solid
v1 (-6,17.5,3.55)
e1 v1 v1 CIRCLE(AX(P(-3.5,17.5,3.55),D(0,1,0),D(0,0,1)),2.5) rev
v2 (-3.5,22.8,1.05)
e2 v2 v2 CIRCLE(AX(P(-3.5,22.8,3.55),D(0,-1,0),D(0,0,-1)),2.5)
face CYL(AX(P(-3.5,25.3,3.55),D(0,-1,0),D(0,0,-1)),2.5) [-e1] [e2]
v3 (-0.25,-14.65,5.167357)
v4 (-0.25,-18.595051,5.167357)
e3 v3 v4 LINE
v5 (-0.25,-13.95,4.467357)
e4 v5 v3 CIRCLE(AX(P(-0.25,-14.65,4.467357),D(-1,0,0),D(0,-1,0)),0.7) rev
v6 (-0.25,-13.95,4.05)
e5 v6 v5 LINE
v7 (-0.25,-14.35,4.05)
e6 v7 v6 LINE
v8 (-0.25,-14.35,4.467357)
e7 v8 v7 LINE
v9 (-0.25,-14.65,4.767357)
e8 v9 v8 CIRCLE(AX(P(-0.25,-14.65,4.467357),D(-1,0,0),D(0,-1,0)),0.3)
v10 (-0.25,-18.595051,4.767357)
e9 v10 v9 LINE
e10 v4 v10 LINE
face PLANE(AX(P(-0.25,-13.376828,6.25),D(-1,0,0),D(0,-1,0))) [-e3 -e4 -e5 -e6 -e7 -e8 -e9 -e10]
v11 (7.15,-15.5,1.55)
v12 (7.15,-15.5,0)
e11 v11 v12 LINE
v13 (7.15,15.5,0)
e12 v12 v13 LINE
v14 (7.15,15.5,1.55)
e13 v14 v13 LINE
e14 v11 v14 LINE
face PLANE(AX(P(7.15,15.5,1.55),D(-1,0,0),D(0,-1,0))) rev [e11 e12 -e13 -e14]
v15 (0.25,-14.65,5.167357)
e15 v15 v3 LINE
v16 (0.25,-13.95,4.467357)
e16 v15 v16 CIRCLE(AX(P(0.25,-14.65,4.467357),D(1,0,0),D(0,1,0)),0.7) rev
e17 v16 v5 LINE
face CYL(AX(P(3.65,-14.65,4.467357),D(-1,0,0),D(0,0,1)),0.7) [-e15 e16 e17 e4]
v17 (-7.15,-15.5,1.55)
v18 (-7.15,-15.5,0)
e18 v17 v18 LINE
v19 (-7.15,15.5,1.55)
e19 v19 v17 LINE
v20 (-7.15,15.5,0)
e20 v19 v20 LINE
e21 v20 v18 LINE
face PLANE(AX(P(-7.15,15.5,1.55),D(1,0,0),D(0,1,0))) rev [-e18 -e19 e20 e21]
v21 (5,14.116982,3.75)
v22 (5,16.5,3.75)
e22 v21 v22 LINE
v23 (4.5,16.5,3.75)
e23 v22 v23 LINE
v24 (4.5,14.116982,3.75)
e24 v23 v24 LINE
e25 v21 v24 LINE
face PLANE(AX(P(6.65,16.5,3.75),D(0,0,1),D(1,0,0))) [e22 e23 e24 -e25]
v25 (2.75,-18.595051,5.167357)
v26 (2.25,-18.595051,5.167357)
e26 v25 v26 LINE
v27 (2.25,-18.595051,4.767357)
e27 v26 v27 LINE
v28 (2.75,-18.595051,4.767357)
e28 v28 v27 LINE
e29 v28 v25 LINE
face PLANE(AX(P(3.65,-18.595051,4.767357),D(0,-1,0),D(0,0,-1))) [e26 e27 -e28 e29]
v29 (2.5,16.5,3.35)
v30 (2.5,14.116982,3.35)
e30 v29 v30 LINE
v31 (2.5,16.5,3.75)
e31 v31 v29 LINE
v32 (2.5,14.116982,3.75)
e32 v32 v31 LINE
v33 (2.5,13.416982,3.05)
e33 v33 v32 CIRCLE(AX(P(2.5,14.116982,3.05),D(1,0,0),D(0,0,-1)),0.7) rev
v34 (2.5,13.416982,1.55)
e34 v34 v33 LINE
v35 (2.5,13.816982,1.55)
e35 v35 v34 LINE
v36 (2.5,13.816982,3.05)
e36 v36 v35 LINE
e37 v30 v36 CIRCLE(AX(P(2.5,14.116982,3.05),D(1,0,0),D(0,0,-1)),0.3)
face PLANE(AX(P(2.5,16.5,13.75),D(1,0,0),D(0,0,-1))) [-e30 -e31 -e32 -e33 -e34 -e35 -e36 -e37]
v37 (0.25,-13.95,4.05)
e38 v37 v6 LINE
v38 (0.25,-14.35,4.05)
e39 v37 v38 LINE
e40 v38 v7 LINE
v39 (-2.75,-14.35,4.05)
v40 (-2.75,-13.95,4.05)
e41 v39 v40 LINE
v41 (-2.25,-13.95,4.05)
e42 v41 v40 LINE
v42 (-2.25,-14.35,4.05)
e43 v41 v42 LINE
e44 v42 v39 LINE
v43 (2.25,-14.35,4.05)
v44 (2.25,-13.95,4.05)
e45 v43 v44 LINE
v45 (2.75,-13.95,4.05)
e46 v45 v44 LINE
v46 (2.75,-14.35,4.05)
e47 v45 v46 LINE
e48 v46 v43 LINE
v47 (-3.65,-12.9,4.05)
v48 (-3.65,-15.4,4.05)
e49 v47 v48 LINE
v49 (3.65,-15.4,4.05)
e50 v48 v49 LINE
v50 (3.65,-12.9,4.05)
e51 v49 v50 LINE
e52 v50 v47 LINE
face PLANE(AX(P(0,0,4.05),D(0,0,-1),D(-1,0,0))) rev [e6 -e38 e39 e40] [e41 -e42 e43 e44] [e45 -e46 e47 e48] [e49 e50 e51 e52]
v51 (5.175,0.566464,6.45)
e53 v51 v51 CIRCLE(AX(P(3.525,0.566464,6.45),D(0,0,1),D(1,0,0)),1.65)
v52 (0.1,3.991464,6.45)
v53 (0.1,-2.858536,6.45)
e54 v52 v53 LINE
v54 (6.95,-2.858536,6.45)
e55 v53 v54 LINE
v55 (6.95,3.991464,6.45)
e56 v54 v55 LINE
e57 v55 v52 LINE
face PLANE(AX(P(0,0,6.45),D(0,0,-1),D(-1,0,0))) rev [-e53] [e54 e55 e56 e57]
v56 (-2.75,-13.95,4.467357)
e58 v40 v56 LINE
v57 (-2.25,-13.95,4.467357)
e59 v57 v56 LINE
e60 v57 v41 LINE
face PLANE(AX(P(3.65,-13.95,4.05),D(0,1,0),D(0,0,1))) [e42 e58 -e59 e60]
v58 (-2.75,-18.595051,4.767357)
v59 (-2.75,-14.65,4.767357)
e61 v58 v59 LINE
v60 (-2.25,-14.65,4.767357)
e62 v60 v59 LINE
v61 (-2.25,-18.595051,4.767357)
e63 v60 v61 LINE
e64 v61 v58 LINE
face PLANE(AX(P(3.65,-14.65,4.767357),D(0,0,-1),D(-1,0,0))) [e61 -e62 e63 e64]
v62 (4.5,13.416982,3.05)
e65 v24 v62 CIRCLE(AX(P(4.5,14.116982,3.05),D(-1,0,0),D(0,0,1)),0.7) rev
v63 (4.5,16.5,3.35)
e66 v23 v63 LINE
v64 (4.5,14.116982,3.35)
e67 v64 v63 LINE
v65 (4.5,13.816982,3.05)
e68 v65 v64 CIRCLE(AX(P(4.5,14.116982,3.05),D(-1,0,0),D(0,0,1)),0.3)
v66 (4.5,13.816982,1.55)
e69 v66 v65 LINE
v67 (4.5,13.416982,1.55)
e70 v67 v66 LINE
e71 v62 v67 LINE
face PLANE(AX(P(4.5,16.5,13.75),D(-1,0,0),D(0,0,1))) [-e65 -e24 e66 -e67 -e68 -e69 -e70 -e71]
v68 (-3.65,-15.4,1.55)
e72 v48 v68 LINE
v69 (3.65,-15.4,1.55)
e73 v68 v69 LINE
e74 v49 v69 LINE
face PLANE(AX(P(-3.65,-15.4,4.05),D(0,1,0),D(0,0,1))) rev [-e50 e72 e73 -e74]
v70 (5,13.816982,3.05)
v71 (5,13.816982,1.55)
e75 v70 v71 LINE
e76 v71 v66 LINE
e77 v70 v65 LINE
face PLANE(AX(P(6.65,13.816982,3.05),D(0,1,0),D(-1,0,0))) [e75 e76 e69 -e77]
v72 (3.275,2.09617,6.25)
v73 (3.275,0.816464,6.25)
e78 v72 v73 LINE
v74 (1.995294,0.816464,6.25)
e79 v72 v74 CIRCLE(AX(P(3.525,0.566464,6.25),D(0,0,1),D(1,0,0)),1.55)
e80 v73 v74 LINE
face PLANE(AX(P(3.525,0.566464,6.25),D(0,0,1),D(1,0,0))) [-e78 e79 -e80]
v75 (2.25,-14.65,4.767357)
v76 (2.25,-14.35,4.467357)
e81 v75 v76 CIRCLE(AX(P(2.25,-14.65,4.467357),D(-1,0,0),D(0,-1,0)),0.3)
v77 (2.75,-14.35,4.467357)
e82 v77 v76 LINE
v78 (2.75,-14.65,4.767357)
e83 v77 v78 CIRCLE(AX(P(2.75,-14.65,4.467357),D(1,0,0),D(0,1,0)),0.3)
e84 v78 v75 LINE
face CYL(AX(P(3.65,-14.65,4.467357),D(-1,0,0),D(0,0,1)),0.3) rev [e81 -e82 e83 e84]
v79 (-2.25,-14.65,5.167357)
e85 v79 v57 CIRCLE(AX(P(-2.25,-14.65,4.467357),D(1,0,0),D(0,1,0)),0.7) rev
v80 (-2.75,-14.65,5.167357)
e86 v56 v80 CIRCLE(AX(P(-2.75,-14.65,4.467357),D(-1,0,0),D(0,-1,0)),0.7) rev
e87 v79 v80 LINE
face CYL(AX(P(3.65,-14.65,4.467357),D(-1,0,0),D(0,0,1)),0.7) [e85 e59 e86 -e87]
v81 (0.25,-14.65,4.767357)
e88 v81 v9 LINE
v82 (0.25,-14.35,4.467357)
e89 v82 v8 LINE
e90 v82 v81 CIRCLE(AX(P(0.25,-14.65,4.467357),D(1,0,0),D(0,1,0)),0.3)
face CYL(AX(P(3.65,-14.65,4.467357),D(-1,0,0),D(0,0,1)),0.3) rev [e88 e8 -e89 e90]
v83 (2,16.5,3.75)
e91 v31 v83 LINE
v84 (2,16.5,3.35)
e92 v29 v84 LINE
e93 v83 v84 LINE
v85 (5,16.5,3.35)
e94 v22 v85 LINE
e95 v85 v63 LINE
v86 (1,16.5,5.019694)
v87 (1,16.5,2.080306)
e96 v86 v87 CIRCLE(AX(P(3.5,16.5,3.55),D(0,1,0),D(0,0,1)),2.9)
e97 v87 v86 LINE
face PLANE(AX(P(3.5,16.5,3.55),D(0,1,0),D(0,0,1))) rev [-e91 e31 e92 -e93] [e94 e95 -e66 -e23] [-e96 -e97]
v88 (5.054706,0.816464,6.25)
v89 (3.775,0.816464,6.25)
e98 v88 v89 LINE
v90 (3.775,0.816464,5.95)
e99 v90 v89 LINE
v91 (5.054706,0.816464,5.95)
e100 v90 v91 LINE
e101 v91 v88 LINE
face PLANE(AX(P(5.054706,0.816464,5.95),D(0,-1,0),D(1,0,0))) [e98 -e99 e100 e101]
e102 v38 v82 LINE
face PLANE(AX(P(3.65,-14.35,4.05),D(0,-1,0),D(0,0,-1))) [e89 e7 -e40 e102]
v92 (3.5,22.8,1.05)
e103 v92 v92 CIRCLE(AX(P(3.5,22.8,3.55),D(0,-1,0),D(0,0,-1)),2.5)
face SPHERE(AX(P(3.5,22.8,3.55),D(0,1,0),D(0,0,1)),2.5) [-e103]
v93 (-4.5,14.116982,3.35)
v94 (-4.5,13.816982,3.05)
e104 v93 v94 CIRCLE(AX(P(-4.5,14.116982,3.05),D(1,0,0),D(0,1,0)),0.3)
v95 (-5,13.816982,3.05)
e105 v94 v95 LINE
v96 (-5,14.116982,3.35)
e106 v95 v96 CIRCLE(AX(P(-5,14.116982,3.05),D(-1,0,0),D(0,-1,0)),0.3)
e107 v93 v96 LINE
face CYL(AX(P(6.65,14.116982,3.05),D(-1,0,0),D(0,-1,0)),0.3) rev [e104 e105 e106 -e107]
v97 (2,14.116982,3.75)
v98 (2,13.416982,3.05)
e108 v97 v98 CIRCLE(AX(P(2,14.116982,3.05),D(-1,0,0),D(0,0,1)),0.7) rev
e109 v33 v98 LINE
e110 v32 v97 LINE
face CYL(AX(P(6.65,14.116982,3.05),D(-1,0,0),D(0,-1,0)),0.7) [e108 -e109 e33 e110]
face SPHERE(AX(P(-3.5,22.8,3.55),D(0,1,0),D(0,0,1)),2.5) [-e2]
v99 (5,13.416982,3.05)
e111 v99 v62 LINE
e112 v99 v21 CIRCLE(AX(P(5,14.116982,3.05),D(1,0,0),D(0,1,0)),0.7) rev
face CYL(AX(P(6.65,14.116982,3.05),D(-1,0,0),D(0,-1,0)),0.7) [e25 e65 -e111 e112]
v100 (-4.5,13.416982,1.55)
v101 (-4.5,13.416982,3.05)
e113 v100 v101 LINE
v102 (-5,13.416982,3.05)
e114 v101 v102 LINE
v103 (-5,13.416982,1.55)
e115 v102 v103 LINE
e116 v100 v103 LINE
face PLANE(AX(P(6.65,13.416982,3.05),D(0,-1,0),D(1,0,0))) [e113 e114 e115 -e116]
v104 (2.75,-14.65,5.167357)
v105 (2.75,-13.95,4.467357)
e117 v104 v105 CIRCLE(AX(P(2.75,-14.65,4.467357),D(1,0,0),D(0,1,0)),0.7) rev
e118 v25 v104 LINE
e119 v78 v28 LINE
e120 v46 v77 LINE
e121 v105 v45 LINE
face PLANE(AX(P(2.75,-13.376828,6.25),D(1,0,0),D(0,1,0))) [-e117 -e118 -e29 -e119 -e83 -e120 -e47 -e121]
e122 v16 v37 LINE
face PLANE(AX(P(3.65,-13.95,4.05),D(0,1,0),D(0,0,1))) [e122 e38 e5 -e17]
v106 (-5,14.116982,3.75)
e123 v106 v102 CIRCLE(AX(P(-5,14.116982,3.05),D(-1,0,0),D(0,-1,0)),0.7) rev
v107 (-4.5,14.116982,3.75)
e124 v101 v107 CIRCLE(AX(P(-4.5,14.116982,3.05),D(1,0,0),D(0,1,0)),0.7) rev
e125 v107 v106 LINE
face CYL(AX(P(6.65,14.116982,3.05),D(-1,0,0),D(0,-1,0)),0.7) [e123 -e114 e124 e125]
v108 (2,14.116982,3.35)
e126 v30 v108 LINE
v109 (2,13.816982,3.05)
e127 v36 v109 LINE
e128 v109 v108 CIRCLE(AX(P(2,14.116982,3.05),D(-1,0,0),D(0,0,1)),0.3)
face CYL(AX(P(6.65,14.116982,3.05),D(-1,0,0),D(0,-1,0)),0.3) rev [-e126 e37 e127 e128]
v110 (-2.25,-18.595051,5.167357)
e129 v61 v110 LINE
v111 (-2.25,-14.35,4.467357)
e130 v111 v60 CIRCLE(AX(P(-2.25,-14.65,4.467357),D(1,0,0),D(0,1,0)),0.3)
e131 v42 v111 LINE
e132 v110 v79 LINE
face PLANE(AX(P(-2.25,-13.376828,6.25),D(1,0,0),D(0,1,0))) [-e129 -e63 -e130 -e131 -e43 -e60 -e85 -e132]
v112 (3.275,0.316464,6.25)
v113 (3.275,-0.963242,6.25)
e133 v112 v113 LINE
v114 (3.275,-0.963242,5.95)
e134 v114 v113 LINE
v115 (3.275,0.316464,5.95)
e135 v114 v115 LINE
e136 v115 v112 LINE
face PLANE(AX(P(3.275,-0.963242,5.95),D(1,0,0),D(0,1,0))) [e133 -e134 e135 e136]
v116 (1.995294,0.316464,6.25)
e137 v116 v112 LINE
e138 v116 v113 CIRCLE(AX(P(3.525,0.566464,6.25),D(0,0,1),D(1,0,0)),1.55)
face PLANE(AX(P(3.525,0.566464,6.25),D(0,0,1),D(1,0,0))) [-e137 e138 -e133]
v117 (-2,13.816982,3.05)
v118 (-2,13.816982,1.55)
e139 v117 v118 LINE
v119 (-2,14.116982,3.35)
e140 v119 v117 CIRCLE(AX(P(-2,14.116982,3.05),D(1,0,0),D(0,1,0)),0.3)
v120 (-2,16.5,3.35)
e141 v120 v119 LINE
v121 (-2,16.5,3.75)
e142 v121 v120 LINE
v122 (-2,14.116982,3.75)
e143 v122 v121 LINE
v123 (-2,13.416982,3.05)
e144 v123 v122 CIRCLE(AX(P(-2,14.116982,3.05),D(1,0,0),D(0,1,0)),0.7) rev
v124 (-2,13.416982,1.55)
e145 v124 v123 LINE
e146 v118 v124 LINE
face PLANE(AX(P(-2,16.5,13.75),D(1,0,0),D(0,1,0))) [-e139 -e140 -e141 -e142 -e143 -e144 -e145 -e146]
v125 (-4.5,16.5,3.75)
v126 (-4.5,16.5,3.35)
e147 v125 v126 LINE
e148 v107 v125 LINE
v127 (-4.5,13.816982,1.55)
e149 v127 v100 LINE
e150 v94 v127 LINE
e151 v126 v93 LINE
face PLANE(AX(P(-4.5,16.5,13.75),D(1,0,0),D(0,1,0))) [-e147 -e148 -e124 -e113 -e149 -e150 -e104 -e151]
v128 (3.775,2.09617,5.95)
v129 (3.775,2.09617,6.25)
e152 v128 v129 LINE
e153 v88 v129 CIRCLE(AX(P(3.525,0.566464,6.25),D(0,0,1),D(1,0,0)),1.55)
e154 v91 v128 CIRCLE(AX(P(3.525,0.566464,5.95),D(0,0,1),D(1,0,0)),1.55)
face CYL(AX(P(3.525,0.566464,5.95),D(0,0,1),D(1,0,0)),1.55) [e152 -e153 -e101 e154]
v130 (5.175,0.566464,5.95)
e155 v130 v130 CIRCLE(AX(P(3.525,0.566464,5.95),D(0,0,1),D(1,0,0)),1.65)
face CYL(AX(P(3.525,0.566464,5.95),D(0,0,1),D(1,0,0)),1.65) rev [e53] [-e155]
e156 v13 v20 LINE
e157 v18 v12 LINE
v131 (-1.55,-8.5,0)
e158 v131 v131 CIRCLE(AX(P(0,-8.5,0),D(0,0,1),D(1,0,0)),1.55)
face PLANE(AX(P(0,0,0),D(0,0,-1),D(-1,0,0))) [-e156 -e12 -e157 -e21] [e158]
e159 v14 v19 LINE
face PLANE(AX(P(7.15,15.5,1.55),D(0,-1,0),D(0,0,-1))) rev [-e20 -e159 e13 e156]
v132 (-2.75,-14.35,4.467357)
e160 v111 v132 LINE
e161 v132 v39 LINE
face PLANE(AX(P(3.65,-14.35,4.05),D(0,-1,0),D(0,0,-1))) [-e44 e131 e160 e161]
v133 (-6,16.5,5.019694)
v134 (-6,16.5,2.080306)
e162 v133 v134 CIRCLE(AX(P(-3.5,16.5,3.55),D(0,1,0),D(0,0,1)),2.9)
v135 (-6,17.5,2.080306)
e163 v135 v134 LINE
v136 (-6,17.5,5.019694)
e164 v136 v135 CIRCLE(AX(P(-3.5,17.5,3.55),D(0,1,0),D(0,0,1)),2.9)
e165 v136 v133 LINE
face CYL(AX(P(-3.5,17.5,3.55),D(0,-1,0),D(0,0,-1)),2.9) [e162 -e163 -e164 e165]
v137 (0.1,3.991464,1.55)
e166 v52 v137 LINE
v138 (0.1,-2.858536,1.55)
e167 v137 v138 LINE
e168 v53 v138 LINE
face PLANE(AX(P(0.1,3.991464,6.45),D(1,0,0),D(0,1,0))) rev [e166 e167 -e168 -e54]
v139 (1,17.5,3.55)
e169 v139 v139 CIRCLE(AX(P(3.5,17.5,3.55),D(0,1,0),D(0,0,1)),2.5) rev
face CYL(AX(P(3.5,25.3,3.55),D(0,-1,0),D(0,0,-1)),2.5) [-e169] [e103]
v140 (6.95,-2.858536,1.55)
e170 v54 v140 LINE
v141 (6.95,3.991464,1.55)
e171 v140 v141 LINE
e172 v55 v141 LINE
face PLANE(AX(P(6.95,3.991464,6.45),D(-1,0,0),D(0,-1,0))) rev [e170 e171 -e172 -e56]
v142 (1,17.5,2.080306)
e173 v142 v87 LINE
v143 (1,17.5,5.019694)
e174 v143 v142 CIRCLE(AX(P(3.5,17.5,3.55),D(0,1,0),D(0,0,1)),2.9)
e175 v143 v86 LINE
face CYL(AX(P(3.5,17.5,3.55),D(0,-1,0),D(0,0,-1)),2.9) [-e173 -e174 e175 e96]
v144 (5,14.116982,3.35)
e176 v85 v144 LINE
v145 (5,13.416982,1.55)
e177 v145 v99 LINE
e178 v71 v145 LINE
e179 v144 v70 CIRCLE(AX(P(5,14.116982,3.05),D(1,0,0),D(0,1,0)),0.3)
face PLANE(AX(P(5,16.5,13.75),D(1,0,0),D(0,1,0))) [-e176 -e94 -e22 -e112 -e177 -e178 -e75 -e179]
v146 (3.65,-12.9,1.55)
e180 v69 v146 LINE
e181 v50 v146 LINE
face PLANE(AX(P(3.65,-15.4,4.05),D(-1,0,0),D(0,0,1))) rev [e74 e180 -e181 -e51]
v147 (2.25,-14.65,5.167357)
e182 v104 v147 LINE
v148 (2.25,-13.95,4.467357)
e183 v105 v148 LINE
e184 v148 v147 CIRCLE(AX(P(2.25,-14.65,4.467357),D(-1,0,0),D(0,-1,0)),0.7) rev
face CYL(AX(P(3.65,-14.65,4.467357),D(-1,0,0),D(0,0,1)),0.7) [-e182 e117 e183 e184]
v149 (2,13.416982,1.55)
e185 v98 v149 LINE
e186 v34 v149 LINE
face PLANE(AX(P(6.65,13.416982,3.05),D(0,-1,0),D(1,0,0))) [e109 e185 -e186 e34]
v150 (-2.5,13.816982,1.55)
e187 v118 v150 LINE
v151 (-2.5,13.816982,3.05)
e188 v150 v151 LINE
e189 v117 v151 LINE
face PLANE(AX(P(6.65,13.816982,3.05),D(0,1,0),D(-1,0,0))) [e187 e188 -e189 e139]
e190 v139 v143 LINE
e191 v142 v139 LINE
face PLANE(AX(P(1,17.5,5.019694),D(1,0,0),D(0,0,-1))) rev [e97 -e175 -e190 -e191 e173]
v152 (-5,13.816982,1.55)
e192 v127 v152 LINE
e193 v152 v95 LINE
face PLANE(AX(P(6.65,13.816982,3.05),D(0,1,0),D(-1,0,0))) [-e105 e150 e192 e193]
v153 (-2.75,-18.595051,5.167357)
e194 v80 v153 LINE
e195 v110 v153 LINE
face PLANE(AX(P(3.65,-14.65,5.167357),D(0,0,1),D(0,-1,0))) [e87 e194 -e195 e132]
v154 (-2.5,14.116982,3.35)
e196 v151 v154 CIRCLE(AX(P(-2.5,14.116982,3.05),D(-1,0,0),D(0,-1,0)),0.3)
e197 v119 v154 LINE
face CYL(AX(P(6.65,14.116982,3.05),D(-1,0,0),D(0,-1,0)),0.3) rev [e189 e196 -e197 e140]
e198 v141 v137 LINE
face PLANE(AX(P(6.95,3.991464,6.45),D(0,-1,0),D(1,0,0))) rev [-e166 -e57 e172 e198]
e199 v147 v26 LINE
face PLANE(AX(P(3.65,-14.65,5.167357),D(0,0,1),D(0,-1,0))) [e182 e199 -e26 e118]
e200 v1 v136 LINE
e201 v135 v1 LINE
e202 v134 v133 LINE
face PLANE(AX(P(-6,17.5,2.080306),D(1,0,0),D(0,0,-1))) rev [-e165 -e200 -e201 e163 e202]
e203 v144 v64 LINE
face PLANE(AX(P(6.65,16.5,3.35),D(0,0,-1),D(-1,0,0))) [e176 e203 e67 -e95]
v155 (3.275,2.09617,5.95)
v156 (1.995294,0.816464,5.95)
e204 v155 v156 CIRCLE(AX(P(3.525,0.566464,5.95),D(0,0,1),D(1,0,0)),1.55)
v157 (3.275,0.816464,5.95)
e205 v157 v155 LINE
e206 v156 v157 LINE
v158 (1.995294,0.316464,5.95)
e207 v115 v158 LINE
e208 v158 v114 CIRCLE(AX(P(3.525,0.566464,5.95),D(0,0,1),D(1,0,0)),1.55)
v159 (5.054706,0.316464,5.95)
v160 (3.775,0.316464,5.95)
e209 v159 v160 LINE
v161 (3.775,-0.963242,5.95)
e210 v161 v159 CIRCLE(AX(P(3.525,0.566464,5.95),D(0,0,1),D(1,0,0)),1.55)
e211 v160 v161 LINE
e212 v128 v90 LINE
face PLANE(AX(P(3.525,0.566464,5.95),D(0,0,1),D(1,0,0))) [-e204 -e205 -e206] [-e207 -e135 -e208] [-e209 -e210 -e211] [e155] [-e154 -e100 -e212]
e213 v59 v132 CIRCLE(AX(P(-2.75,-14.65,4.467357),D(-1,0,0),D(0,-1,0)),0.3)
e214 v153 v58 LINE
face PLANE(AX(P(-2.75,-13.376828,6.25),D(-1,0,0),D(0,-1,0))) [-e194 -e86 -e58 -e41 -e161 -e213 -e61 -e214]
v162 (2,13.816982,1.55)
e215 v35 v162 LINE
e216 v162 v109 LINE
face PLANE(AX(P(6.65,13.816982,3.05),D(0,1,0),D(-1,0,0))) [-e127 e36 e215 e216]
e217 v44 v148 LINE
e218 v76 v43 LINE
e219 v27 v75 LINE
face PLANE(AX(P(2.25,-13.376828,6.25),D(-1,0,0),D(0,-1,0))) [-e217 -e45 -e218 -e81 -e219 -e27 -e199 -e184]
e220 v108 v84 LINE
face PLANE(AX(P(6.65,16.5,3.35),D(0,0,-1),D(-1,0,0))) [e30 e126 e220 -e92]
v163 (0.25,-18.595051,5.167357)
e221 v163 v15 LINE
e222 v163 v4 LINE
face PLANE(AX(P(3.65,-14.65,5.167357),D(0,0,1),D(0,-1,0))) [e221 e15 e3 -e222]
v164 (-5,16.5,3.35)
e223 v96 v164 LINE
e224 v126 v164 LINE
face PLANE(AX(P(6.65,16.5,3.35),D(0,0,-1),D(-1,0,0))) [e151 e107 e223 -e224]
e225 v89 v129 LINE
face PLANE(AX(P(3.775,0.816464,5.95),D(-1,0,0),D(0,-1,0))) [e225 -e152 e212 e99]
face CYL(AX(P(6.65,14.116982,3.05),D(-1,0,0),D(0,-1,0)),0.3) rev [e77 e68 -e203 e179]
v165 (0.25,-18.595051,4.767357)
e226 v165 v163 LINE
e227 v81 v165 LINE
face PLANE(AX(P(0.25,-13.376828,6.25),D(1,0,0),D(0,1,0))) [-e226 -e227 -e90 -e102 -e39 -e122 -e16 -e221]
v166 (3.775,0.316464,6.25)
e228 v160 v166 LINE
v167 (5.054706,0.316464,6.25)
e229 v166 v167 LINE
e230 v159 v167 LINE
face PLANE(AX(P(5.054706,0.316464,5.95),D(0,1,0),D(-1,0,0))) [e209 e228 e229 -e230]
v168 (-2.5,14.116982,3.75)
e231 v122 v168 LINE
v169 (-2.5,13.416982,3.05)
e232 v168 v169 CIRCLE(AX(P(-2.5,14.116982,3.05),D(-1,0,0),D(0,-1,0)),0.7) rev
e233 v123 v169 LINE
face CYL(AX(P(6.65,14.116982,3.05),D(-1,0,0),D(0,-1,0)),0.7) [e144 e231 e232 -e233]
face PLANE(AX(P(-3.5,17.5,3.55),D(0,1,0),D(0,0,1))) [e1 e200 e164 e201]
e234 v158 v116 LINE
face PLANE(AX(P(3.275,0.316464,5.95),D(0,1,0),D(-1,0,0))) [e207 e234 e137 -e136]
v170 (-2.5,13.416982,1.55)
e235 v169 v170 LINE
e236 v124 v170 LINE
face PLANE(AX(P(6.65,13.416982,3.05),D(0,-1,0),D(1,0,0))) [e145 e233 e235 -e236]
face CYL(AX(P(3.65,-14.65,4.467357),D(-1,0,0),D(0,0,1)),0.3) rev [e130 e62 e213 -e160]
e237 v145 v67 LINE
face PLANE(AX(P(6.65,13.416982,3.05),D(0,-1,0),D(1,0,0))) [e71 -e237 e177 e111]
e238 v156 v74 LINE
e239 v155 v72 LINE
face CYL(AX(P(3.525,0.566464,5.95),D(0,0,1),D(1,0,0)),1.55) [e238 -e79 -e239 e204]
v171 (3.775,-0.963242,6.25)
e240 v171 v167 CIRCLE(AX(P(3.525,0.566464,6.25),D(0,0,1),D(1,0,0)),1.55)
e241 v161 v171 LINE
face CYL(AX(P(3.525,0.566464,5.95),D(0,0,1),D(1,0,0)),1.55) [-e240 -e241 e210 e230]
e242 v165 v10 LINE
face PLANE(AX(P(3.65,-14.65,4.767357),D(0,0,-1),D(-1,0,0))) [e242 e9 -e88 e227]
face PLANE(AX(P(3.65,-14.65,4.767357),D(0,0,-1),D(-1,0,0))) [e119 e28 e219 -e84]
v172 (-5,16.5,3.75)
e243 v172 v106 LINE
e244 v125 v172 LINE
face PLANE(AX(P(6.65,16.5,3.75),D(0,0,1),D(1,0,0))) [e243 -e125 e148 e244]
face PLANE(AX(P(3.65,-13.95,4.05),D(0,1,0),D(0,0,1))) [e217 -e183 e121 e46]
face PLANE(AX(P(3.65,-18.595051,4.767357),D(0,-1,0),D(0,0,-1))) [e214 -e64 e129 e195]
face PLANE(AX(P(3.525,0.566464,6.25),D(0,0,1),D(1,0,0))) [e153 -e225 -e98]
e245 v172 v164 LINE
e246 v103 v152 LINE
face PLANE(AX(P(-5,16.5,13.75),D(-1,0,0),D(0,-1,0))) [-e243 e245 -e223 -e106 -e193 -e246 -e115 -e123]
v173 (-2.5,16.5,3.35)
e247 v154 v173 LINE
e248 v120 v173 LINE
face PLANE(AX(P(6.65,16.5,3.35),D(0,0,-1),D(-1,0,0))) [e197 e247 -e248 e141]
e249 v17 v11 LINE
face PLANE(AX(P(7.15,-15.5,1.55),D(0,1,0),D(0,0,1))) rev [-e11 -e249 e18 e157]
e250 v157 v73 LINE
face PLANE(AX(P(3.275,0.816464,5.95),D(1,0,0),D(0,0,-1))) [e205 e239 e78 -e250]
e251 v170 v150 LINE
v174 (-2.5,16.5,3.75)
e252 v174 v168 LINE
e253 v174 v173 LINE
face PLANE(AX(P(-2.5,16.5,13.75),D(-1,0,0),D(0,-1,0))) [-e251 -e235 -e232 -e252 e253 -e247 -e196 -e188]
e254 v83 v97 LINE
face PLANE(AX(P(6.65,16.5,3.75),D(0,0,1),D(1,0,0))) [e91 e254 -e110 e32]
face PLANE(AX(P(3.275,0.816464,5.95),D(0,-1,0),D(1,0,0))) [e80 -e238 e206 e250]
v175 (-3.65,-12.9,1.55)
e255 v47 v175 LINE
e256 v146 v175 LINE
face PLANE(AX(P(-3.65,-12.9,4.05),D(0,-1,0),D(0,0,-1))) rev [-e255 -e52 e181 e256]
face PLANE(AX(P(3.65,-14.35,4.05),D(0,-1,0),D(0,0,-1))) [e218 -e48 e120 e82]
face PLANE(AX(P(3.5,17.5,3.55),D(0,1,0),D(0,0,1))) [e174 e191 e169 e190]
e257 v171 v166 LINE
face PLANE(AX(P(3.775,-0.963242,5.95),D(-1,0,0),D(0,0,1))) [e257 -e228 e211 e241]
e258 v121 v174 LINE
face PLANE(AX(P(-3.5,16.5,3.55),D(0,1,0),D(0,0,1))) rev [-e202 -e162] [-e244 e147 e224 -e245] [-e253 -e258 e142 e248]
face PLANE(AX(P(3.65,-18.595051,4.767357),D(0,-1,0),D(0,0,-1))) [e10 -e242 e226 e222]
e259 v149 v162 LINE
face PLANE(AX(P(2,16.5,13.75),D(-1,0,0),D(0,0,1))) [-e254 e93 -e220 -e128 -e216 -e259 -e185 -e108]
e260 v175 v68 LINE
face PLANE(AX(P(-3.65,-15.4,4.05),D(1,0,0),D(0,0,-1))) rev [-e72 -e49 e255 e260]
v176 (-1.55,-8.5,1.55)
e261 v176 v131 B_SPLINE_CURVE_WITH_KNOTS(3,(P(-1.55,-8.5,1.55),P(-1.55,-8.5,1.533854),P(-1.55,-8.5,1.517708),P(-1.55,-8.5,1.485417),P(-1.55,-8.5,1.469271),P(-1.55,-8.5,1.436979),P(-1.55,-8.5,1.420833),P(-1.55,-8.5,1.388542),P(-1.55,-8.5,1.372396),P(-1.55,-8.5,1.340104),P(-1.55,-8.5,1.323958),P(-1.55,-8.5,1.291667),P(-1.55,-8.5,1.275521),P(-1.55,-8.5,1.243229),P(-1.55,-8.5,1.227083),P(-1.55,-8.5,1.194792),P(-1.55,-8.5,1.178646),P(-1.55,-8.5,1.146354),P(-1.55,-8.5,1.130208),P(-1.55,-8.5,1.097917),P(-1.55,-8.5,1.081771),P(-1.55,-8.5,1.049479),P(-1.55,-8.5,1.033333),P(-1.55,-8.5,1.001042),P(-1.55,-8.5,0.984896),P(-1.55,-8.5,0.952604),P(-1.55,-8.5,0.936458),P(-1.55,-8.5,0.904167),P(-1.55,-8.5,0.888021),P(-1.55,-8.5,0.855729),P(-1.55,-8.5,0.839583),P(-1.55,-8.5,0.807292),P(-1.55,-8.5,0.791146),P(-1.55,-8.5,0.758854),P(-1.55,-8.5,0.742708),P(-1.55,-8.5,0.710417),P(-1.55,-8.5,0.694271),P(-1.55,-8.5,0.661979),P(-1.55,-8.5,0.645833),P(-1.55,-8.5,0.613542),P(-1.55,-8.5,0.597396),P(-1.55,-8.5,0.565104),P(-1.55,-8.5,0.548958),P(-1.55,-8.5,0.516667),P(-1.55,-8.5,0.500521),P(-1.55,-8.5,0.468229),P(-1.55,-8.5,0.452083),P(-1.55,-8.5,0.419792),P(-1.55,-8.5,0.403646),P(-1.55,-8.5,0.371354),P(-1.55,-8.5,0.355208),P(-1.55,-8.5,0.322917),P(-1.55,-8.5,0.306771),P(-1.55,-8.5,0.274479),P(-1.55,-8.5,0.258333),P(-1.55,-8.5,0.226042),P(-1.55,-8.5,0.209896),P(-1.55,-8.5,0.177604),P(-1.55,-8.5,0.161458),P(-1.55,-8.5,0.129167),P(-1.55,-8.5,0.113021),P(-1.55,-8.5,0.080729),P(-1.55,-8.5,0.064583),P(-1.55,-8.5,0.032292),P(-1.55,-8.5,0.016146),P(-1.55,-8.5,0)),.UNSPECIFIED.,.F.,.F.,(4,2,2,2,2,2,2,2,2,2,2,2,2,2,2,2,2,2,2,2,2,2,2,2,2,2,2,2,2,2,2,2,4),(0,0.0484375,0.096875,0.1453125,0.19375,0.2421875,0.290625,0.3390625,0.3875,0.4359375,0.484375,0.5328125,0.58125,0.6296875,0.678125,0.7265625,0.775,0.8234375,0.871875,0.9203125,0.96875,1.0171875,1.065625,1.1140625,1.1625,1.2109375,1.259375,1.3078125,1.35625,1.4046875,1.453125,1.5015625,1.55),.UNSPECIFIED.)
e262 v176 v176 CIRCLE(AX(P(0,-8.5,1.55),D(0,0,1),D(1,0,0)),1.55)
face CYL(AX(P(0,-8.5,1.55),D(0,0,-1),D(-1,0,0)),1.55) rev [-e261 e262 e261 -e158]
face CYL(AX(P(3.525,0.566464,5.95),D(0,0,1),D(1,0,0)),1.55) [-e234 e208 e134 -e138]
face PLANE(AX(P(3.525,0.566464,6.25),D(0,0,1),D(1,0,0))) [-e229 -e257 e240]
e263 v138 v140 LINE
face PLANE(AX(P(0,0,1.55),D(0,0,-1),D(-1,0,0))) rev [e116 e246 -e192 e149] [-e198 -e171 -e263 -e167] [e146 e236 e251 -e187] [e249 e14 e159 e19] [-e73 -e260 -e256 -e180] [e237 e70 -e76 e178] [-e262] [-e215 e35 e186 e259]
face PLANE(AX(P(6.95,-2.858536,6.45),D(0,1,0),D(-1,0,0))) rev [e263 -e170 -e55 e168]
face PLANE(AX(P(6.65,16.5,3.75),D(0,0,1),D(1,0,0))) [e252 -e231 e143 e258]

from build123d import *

# Parameters (mm, degrees)
ESBO_O1_W                   = 14.3
ESBO_O1_H                   = 31
ESBO_O1_R                   = 1.55
RESSALTO_EXTRUS_O1_DEPTH    = 1.55
ESBO_O2_W                   = 6.85
ESBO_O2_H                   = 6.85
RESSALTO_EXTRUS_O2_DEPTH    = 6.45
ESBO_O3_R                   = 1.65
CORTE_EXTRUS_O1_DEPTH       = 0.5
ESBO_O4_W                   = 7.3
ESBO_O4_H                   = 2.5
RESSALTO_EXTRUS_O3_DEPTH    = 4.05
RESSALTO_EXTRUS_O4_DEPTH    = 1
RESSALTO_EXTRUS_O4_2_DEPTH  = 1
ESBO_O6_R                   = 2.5
RESSALTO_EXTRUS_O5_DEPTH    = 8.8
FILETE1_R                   = 2.5
FILETE2_R                   = 2.5
RESSALTO_EXTRUS_O6_DEPTH    = 13.8
ESBO_O9_R                   = 1.55
CORTE_EXTRUS_O3_DEPTH       = 0.2
CORTE_EXTRUS_O2_START       = -2.2
CORTE_EXTRUS_O2_OUTLINE_W   = 1.65
CORTE_EXTRUS_O2_OUTLINE_H   = 3.08301819
CORTE_EXTRUS_O2_OUTLINE_W_2 = 2
CORTE_EXTRUS_O2_OUTLINE_W_3 = 4
CORTE_EXTRUS_O2_OUTLINE_W_4 = 2.15
CORTE_EXTRUS_O2_DEPTH       = 2.2
RESSALTO_EXTRUS_O7_START    = -7.3
RESSALTO_EXTRUS_O7_DEPTH    = 7.3
ESBO_O12_W                  = 1.34798559
ESBO_O12_H                  = 5.991047065
ESBO_O12_W_2                = 0.998507844
ESBO_O12_W_3                = 2
CORTE_EXTRUS_O4_DEPTH       = 2.2


# Read off the part's stored shape, not the designer's step: Corte-extrusão2, Ressalto-extrusão7
with BuildPart() as part:
    # Esboço1 → Ressalto-extrusão1 (new body)
    with BuildSketch(Plane.XY):
        Rectangle(ESBO_O1_W, ESBO_O1_H)
        with Locations(Location((0, -8.5, 0), (0, 0, 180))):
            Circle(ESBO_O1_R, mode=Mode.SUBTRACT)
    extrude(amount=RESSALTO_EXTRUS_O1_DEPTH)

    # Esboço2 → Ressalto-extrusão2 (add)
    with BuildSketch(Plane.XY):
        with Locations((3.525, 0.5664641)):
            Rectangle(ESBO_O2_W, ESBO_O2_H)
    extrude(amount=RESSALTO_EXTRUS_O2_DEPTH)

    # Esboço3 → Corte-extrusão1 (cut)
    with BuildSketch(Plane.XY.offset(6.45)):
        with Locations((3.525, 0.5664641)):
            Circle(ESBO_O3_R)
        with BuildLine():
            Line((3.775, 0.8164641), (3.775, 2.096169954))
            ThreePointArc((3.775, 2.096169954), (4.621015511, 1.662479611), (5.054705854, 0.8164641))
            Line((5.054705854, 0.8164641), (3.775, 0.8164641))
        make_face(mode=Mode.SUBTRACT)
        with BuildLine():
            Line((3.775, -0.963241754), (3.775, 0.3164641))
            Line((3.775, 0.3164641), (5.054705854, 0.3164641))
            ThreePointArc((5.054705854, 0.3164641), (4.621015511, -0.529551411), (3.775, -0.963241754))
        make_face(mode=Mode.SUBTRACT)
        with BuildLine():
            Line((3.275, -0.963241754), (3.275, 0.3164641))
            Line((3.275, 0.3164641), (1.995294146, 0.3164641))
            ThreePointArc((1.995294146, 0.3164641), (2.428984489, -0.529551411), (3.275, -0.963241754))
        make_face(mode=Mode.SUBTRACT)
        with BuildLine():
            Line((3.275, 0.8164641), (3.275, 2.096169954))
            ThreePointArc((3.275, 2.096169954), (2.428984489, 1.662479611), (1.995294146, 0.8164641))
            Line((1.995294146, 0.8164641), (3.275, 0.8164641))
        make_face(mode=Mode.SUBTRACT)
    extrude(amount=-CORTE_EXTRUS_O1_DEPTH, mode=Mode.SUBTRACT)

    # Esboço4 → Ressalto-extrusão3 (add)
    with BuildSketch(Plane.XY):
        with Locations((0, -14.15)):
            Rectangle(ESBO_O4_W, ESBO_O4_H)
    extrude(amount=RESSALTO_EXTRUS_O3_DEPTH)



with BuildPart() as body_2:
    # Esboço5 → Ressalto-extrusão4 (new body)
    with BuildSketch(Plane(origin=(0, 16.5, 0), x_dir=(1, 0, 0), z_dir=(0, 1, 0))):
        with BuildLine():
            Line((1, -5.019693846), (1, -2.080306154))
            ThreePointArc((1, -2.080306154), (6.4, -3.55), (1, -5.019693846))
        make_face()
    extrude(amount=RESSALTO_EXTRUS_O4_DEPTH)



with BuildPart() as body_3:
    # Esboço5 → Ressalto-extrus_o4 2 (new body)
    with BuildSketch(Plane(origin=(0, 16.5, 0), x_dir=(1, 0, 0), z_dir=(0, 1, 0))):
        with BuildLine():
            Line((-6, -2.080306154), (-6, -5.019693846))
            ThreePointArc((-6, -5.019693846), (-0.6, -3.55), (-6, -2.080306154))
        make_face()
    extrude(amount=RESSALTO_EXTRUS_O4_2_DEPTH)


with BuildPart() as body_2_1:
    add(body_2.part)

    add(body_3.part)  # Ressalto-extrusão5 merges body 3
    # Esboço6 → Ressalto-extrusão5 (add)
    with BuildSketch(Plane(origin=(0, 16.5, 0), x_dir=(1, 0, 0), z_dir=(0, 1, 0))):
        with Locations(Location((3.5, -3.55, 0), (0, 0, 180))):
            Circle(ESBO_O6_R)
        with Locations(Location((-3.5, -3.55, 0), (0, 0, 180))):
            Circle(ESBO_O6_R)
    extrude(amount=RESSALTO_EXTRUS_O5_DEPTH)

    # Filete1
    filete1_edges = [body_2_1.edges().sort_by_distance(p)[0] for p in [
        (-1, 25.3, 3.55),
    ]]
    fillet(filete1_edges, radius=FILETE1_R)

    # Filete2
    filete2_edges = [body_2_1.edges().sort_by_distance(p)[0] for p in [
        (6, 25.3, 3.55),
    ]]
    fillet(filete2_edges, radius=FILETE2_R)


with BuildPart() as part_1:
    add(part.part)

    add(body_2_1.part)  # Ressalto-extrusão6 merges body 2
    # Esboço7 → Ressalto-extrusão6 (add)
    with BuildSketch(Plane.ZY.offset(7.15)):
        with BuildLine():
            Line((3.35, 16.5), (3.35, 14.11698181))
            ThreePointArc((3.35, 14.11698181), (3.262132034, 13.904849775), (3.05, 13.81698181))
            Line((3.05, 13.81698181), (1.55, 13.81698181))
            Line((1.55, 13.81698181), (1.55, 13.41698181))
            Line((1.55, 13.41698181), (3.05, 13.41698181))
            ThreePointArc((3.05, 13.41698181), (3.544974747, 13.622007063), (3.75, 14.11698181))
            Line((3.75, 14.11698181), (3.75, 16.5))
            Line((3.75, 16.5), (3.35, 16.5))
        make_face()
    extrude(amount=-RESSALTO_EXTRUS_O6_DEPTH)

    # Esboço9 → Corte-extrusão3 (cut)
    with BuildSketch(Plane.XY.offset(6.45)):
        with Locations((3.525, 0.5664641)):
            Circle(ESBO_O9_R)
    extrude(amount=-CORTE_EXTRUS_O3_DEPTH, mode=Mode.SUBTRACT)

    # Corte-extrusão2 outline → Corte-extrusão2 (cut)
    with BuildSketch(Plane.XY.offset(3.75).offset(CORTE_EXTRUS_O2_START)):
        with Locations((5.825, 14.958490905)):
            Rectangle(CORTE_EXTRUS_O2_OUTLINE_W, CORTE_EXTRUS_O2_OUTLINE_H)
        with Locations((3.5, 14.958490905)):
            Rectangle(CORTE_EXTRUS_O2_OUTLINE_W_2, CORTE_EXTRUS_O2_OUTLINE_H)
        with Locations((0, 14.958490905)):
            Rectangle(CORTE_EXTRUS_O2_OUTLINE_W_3, CORTE_EXTRUS_O2_OUTLINE_H)
        with Locations((-3.5, 14.958490905)):
            Rectangle(CORTE_EXTRUS_O2_OUTLINE_W_2, CORTE_EXTRUS_O2_OUTLINE_H)
        with Locations((-6.075, 14.958490905)):
            Rectangle(CORTE_EXTRUS_O2_OUTLINE_W_4, CORTE_EXTRUS_O2_OUTLINE_H)
    extrude(amount=CORTE_EXTRUS_O2_DEPTH, mode=Mode.SUBTRACT)

    # Ressalto-extrusão7 outline → Ressalto-extrusão7 (add)
    with BuildSketch(Plane.ZY.offset(3.65).offset(RESSALTO_EXTRUS_O7_START)):
        with BuildLine():
            ThreePointArc((5.167357012, -14.65), (4.962331759, -14.155025253), (4.467357012, -13.95))
            Line((4.467357012, -13.95), (4.05, -13.95))
            Line((4.05, -13.95), (4.05, -14.35))
            Line((4.05, -14.35), (4.467357012, -14.35))
            ThreePointArc((4.467357012, -14.35), (4.679489046, -14.437867966), (4.767357012, -14.65))
            Line((4.767357012, -14.65), (4.767357012, -18.595051461))
            Line((4.767357012, -18.595051461), (5.167357012, -18.595051461))
            Line((5.167357012, -18.595051461), (5.167357012, -14.65))
        make_face()
    extrude(amount=RESSALTO_EXTRUS_O7_DEPTH)

    # Esboço12 → Corte-extrusão4 (cut)
    with BuildSketch(Plane.XY.offset(4.05)):
        with Locations((-3.423992795, -16.372351479)):
            Rectangle(ESBO_O12_W, ESBO_O12_H)
        with Locations((3.249253922, -16.372351479)):
            Rectangle(ESBO_O12_W_2, ESBO_O12_H)
        with Locations((-1.25, -16.372351479)):
            Rectangle(ESBO_O12_W_3, ESBO_O12_H)
        with Locations((1.25, -16.372351479)):
            Rectangle(ESBO_O12_W_3, ESBO_O12_H)
    extrude(amount=CORTE_EXTRUS_O4_DEPTH, mode=Mode.SUBTRACT)


solid = part_1.part
